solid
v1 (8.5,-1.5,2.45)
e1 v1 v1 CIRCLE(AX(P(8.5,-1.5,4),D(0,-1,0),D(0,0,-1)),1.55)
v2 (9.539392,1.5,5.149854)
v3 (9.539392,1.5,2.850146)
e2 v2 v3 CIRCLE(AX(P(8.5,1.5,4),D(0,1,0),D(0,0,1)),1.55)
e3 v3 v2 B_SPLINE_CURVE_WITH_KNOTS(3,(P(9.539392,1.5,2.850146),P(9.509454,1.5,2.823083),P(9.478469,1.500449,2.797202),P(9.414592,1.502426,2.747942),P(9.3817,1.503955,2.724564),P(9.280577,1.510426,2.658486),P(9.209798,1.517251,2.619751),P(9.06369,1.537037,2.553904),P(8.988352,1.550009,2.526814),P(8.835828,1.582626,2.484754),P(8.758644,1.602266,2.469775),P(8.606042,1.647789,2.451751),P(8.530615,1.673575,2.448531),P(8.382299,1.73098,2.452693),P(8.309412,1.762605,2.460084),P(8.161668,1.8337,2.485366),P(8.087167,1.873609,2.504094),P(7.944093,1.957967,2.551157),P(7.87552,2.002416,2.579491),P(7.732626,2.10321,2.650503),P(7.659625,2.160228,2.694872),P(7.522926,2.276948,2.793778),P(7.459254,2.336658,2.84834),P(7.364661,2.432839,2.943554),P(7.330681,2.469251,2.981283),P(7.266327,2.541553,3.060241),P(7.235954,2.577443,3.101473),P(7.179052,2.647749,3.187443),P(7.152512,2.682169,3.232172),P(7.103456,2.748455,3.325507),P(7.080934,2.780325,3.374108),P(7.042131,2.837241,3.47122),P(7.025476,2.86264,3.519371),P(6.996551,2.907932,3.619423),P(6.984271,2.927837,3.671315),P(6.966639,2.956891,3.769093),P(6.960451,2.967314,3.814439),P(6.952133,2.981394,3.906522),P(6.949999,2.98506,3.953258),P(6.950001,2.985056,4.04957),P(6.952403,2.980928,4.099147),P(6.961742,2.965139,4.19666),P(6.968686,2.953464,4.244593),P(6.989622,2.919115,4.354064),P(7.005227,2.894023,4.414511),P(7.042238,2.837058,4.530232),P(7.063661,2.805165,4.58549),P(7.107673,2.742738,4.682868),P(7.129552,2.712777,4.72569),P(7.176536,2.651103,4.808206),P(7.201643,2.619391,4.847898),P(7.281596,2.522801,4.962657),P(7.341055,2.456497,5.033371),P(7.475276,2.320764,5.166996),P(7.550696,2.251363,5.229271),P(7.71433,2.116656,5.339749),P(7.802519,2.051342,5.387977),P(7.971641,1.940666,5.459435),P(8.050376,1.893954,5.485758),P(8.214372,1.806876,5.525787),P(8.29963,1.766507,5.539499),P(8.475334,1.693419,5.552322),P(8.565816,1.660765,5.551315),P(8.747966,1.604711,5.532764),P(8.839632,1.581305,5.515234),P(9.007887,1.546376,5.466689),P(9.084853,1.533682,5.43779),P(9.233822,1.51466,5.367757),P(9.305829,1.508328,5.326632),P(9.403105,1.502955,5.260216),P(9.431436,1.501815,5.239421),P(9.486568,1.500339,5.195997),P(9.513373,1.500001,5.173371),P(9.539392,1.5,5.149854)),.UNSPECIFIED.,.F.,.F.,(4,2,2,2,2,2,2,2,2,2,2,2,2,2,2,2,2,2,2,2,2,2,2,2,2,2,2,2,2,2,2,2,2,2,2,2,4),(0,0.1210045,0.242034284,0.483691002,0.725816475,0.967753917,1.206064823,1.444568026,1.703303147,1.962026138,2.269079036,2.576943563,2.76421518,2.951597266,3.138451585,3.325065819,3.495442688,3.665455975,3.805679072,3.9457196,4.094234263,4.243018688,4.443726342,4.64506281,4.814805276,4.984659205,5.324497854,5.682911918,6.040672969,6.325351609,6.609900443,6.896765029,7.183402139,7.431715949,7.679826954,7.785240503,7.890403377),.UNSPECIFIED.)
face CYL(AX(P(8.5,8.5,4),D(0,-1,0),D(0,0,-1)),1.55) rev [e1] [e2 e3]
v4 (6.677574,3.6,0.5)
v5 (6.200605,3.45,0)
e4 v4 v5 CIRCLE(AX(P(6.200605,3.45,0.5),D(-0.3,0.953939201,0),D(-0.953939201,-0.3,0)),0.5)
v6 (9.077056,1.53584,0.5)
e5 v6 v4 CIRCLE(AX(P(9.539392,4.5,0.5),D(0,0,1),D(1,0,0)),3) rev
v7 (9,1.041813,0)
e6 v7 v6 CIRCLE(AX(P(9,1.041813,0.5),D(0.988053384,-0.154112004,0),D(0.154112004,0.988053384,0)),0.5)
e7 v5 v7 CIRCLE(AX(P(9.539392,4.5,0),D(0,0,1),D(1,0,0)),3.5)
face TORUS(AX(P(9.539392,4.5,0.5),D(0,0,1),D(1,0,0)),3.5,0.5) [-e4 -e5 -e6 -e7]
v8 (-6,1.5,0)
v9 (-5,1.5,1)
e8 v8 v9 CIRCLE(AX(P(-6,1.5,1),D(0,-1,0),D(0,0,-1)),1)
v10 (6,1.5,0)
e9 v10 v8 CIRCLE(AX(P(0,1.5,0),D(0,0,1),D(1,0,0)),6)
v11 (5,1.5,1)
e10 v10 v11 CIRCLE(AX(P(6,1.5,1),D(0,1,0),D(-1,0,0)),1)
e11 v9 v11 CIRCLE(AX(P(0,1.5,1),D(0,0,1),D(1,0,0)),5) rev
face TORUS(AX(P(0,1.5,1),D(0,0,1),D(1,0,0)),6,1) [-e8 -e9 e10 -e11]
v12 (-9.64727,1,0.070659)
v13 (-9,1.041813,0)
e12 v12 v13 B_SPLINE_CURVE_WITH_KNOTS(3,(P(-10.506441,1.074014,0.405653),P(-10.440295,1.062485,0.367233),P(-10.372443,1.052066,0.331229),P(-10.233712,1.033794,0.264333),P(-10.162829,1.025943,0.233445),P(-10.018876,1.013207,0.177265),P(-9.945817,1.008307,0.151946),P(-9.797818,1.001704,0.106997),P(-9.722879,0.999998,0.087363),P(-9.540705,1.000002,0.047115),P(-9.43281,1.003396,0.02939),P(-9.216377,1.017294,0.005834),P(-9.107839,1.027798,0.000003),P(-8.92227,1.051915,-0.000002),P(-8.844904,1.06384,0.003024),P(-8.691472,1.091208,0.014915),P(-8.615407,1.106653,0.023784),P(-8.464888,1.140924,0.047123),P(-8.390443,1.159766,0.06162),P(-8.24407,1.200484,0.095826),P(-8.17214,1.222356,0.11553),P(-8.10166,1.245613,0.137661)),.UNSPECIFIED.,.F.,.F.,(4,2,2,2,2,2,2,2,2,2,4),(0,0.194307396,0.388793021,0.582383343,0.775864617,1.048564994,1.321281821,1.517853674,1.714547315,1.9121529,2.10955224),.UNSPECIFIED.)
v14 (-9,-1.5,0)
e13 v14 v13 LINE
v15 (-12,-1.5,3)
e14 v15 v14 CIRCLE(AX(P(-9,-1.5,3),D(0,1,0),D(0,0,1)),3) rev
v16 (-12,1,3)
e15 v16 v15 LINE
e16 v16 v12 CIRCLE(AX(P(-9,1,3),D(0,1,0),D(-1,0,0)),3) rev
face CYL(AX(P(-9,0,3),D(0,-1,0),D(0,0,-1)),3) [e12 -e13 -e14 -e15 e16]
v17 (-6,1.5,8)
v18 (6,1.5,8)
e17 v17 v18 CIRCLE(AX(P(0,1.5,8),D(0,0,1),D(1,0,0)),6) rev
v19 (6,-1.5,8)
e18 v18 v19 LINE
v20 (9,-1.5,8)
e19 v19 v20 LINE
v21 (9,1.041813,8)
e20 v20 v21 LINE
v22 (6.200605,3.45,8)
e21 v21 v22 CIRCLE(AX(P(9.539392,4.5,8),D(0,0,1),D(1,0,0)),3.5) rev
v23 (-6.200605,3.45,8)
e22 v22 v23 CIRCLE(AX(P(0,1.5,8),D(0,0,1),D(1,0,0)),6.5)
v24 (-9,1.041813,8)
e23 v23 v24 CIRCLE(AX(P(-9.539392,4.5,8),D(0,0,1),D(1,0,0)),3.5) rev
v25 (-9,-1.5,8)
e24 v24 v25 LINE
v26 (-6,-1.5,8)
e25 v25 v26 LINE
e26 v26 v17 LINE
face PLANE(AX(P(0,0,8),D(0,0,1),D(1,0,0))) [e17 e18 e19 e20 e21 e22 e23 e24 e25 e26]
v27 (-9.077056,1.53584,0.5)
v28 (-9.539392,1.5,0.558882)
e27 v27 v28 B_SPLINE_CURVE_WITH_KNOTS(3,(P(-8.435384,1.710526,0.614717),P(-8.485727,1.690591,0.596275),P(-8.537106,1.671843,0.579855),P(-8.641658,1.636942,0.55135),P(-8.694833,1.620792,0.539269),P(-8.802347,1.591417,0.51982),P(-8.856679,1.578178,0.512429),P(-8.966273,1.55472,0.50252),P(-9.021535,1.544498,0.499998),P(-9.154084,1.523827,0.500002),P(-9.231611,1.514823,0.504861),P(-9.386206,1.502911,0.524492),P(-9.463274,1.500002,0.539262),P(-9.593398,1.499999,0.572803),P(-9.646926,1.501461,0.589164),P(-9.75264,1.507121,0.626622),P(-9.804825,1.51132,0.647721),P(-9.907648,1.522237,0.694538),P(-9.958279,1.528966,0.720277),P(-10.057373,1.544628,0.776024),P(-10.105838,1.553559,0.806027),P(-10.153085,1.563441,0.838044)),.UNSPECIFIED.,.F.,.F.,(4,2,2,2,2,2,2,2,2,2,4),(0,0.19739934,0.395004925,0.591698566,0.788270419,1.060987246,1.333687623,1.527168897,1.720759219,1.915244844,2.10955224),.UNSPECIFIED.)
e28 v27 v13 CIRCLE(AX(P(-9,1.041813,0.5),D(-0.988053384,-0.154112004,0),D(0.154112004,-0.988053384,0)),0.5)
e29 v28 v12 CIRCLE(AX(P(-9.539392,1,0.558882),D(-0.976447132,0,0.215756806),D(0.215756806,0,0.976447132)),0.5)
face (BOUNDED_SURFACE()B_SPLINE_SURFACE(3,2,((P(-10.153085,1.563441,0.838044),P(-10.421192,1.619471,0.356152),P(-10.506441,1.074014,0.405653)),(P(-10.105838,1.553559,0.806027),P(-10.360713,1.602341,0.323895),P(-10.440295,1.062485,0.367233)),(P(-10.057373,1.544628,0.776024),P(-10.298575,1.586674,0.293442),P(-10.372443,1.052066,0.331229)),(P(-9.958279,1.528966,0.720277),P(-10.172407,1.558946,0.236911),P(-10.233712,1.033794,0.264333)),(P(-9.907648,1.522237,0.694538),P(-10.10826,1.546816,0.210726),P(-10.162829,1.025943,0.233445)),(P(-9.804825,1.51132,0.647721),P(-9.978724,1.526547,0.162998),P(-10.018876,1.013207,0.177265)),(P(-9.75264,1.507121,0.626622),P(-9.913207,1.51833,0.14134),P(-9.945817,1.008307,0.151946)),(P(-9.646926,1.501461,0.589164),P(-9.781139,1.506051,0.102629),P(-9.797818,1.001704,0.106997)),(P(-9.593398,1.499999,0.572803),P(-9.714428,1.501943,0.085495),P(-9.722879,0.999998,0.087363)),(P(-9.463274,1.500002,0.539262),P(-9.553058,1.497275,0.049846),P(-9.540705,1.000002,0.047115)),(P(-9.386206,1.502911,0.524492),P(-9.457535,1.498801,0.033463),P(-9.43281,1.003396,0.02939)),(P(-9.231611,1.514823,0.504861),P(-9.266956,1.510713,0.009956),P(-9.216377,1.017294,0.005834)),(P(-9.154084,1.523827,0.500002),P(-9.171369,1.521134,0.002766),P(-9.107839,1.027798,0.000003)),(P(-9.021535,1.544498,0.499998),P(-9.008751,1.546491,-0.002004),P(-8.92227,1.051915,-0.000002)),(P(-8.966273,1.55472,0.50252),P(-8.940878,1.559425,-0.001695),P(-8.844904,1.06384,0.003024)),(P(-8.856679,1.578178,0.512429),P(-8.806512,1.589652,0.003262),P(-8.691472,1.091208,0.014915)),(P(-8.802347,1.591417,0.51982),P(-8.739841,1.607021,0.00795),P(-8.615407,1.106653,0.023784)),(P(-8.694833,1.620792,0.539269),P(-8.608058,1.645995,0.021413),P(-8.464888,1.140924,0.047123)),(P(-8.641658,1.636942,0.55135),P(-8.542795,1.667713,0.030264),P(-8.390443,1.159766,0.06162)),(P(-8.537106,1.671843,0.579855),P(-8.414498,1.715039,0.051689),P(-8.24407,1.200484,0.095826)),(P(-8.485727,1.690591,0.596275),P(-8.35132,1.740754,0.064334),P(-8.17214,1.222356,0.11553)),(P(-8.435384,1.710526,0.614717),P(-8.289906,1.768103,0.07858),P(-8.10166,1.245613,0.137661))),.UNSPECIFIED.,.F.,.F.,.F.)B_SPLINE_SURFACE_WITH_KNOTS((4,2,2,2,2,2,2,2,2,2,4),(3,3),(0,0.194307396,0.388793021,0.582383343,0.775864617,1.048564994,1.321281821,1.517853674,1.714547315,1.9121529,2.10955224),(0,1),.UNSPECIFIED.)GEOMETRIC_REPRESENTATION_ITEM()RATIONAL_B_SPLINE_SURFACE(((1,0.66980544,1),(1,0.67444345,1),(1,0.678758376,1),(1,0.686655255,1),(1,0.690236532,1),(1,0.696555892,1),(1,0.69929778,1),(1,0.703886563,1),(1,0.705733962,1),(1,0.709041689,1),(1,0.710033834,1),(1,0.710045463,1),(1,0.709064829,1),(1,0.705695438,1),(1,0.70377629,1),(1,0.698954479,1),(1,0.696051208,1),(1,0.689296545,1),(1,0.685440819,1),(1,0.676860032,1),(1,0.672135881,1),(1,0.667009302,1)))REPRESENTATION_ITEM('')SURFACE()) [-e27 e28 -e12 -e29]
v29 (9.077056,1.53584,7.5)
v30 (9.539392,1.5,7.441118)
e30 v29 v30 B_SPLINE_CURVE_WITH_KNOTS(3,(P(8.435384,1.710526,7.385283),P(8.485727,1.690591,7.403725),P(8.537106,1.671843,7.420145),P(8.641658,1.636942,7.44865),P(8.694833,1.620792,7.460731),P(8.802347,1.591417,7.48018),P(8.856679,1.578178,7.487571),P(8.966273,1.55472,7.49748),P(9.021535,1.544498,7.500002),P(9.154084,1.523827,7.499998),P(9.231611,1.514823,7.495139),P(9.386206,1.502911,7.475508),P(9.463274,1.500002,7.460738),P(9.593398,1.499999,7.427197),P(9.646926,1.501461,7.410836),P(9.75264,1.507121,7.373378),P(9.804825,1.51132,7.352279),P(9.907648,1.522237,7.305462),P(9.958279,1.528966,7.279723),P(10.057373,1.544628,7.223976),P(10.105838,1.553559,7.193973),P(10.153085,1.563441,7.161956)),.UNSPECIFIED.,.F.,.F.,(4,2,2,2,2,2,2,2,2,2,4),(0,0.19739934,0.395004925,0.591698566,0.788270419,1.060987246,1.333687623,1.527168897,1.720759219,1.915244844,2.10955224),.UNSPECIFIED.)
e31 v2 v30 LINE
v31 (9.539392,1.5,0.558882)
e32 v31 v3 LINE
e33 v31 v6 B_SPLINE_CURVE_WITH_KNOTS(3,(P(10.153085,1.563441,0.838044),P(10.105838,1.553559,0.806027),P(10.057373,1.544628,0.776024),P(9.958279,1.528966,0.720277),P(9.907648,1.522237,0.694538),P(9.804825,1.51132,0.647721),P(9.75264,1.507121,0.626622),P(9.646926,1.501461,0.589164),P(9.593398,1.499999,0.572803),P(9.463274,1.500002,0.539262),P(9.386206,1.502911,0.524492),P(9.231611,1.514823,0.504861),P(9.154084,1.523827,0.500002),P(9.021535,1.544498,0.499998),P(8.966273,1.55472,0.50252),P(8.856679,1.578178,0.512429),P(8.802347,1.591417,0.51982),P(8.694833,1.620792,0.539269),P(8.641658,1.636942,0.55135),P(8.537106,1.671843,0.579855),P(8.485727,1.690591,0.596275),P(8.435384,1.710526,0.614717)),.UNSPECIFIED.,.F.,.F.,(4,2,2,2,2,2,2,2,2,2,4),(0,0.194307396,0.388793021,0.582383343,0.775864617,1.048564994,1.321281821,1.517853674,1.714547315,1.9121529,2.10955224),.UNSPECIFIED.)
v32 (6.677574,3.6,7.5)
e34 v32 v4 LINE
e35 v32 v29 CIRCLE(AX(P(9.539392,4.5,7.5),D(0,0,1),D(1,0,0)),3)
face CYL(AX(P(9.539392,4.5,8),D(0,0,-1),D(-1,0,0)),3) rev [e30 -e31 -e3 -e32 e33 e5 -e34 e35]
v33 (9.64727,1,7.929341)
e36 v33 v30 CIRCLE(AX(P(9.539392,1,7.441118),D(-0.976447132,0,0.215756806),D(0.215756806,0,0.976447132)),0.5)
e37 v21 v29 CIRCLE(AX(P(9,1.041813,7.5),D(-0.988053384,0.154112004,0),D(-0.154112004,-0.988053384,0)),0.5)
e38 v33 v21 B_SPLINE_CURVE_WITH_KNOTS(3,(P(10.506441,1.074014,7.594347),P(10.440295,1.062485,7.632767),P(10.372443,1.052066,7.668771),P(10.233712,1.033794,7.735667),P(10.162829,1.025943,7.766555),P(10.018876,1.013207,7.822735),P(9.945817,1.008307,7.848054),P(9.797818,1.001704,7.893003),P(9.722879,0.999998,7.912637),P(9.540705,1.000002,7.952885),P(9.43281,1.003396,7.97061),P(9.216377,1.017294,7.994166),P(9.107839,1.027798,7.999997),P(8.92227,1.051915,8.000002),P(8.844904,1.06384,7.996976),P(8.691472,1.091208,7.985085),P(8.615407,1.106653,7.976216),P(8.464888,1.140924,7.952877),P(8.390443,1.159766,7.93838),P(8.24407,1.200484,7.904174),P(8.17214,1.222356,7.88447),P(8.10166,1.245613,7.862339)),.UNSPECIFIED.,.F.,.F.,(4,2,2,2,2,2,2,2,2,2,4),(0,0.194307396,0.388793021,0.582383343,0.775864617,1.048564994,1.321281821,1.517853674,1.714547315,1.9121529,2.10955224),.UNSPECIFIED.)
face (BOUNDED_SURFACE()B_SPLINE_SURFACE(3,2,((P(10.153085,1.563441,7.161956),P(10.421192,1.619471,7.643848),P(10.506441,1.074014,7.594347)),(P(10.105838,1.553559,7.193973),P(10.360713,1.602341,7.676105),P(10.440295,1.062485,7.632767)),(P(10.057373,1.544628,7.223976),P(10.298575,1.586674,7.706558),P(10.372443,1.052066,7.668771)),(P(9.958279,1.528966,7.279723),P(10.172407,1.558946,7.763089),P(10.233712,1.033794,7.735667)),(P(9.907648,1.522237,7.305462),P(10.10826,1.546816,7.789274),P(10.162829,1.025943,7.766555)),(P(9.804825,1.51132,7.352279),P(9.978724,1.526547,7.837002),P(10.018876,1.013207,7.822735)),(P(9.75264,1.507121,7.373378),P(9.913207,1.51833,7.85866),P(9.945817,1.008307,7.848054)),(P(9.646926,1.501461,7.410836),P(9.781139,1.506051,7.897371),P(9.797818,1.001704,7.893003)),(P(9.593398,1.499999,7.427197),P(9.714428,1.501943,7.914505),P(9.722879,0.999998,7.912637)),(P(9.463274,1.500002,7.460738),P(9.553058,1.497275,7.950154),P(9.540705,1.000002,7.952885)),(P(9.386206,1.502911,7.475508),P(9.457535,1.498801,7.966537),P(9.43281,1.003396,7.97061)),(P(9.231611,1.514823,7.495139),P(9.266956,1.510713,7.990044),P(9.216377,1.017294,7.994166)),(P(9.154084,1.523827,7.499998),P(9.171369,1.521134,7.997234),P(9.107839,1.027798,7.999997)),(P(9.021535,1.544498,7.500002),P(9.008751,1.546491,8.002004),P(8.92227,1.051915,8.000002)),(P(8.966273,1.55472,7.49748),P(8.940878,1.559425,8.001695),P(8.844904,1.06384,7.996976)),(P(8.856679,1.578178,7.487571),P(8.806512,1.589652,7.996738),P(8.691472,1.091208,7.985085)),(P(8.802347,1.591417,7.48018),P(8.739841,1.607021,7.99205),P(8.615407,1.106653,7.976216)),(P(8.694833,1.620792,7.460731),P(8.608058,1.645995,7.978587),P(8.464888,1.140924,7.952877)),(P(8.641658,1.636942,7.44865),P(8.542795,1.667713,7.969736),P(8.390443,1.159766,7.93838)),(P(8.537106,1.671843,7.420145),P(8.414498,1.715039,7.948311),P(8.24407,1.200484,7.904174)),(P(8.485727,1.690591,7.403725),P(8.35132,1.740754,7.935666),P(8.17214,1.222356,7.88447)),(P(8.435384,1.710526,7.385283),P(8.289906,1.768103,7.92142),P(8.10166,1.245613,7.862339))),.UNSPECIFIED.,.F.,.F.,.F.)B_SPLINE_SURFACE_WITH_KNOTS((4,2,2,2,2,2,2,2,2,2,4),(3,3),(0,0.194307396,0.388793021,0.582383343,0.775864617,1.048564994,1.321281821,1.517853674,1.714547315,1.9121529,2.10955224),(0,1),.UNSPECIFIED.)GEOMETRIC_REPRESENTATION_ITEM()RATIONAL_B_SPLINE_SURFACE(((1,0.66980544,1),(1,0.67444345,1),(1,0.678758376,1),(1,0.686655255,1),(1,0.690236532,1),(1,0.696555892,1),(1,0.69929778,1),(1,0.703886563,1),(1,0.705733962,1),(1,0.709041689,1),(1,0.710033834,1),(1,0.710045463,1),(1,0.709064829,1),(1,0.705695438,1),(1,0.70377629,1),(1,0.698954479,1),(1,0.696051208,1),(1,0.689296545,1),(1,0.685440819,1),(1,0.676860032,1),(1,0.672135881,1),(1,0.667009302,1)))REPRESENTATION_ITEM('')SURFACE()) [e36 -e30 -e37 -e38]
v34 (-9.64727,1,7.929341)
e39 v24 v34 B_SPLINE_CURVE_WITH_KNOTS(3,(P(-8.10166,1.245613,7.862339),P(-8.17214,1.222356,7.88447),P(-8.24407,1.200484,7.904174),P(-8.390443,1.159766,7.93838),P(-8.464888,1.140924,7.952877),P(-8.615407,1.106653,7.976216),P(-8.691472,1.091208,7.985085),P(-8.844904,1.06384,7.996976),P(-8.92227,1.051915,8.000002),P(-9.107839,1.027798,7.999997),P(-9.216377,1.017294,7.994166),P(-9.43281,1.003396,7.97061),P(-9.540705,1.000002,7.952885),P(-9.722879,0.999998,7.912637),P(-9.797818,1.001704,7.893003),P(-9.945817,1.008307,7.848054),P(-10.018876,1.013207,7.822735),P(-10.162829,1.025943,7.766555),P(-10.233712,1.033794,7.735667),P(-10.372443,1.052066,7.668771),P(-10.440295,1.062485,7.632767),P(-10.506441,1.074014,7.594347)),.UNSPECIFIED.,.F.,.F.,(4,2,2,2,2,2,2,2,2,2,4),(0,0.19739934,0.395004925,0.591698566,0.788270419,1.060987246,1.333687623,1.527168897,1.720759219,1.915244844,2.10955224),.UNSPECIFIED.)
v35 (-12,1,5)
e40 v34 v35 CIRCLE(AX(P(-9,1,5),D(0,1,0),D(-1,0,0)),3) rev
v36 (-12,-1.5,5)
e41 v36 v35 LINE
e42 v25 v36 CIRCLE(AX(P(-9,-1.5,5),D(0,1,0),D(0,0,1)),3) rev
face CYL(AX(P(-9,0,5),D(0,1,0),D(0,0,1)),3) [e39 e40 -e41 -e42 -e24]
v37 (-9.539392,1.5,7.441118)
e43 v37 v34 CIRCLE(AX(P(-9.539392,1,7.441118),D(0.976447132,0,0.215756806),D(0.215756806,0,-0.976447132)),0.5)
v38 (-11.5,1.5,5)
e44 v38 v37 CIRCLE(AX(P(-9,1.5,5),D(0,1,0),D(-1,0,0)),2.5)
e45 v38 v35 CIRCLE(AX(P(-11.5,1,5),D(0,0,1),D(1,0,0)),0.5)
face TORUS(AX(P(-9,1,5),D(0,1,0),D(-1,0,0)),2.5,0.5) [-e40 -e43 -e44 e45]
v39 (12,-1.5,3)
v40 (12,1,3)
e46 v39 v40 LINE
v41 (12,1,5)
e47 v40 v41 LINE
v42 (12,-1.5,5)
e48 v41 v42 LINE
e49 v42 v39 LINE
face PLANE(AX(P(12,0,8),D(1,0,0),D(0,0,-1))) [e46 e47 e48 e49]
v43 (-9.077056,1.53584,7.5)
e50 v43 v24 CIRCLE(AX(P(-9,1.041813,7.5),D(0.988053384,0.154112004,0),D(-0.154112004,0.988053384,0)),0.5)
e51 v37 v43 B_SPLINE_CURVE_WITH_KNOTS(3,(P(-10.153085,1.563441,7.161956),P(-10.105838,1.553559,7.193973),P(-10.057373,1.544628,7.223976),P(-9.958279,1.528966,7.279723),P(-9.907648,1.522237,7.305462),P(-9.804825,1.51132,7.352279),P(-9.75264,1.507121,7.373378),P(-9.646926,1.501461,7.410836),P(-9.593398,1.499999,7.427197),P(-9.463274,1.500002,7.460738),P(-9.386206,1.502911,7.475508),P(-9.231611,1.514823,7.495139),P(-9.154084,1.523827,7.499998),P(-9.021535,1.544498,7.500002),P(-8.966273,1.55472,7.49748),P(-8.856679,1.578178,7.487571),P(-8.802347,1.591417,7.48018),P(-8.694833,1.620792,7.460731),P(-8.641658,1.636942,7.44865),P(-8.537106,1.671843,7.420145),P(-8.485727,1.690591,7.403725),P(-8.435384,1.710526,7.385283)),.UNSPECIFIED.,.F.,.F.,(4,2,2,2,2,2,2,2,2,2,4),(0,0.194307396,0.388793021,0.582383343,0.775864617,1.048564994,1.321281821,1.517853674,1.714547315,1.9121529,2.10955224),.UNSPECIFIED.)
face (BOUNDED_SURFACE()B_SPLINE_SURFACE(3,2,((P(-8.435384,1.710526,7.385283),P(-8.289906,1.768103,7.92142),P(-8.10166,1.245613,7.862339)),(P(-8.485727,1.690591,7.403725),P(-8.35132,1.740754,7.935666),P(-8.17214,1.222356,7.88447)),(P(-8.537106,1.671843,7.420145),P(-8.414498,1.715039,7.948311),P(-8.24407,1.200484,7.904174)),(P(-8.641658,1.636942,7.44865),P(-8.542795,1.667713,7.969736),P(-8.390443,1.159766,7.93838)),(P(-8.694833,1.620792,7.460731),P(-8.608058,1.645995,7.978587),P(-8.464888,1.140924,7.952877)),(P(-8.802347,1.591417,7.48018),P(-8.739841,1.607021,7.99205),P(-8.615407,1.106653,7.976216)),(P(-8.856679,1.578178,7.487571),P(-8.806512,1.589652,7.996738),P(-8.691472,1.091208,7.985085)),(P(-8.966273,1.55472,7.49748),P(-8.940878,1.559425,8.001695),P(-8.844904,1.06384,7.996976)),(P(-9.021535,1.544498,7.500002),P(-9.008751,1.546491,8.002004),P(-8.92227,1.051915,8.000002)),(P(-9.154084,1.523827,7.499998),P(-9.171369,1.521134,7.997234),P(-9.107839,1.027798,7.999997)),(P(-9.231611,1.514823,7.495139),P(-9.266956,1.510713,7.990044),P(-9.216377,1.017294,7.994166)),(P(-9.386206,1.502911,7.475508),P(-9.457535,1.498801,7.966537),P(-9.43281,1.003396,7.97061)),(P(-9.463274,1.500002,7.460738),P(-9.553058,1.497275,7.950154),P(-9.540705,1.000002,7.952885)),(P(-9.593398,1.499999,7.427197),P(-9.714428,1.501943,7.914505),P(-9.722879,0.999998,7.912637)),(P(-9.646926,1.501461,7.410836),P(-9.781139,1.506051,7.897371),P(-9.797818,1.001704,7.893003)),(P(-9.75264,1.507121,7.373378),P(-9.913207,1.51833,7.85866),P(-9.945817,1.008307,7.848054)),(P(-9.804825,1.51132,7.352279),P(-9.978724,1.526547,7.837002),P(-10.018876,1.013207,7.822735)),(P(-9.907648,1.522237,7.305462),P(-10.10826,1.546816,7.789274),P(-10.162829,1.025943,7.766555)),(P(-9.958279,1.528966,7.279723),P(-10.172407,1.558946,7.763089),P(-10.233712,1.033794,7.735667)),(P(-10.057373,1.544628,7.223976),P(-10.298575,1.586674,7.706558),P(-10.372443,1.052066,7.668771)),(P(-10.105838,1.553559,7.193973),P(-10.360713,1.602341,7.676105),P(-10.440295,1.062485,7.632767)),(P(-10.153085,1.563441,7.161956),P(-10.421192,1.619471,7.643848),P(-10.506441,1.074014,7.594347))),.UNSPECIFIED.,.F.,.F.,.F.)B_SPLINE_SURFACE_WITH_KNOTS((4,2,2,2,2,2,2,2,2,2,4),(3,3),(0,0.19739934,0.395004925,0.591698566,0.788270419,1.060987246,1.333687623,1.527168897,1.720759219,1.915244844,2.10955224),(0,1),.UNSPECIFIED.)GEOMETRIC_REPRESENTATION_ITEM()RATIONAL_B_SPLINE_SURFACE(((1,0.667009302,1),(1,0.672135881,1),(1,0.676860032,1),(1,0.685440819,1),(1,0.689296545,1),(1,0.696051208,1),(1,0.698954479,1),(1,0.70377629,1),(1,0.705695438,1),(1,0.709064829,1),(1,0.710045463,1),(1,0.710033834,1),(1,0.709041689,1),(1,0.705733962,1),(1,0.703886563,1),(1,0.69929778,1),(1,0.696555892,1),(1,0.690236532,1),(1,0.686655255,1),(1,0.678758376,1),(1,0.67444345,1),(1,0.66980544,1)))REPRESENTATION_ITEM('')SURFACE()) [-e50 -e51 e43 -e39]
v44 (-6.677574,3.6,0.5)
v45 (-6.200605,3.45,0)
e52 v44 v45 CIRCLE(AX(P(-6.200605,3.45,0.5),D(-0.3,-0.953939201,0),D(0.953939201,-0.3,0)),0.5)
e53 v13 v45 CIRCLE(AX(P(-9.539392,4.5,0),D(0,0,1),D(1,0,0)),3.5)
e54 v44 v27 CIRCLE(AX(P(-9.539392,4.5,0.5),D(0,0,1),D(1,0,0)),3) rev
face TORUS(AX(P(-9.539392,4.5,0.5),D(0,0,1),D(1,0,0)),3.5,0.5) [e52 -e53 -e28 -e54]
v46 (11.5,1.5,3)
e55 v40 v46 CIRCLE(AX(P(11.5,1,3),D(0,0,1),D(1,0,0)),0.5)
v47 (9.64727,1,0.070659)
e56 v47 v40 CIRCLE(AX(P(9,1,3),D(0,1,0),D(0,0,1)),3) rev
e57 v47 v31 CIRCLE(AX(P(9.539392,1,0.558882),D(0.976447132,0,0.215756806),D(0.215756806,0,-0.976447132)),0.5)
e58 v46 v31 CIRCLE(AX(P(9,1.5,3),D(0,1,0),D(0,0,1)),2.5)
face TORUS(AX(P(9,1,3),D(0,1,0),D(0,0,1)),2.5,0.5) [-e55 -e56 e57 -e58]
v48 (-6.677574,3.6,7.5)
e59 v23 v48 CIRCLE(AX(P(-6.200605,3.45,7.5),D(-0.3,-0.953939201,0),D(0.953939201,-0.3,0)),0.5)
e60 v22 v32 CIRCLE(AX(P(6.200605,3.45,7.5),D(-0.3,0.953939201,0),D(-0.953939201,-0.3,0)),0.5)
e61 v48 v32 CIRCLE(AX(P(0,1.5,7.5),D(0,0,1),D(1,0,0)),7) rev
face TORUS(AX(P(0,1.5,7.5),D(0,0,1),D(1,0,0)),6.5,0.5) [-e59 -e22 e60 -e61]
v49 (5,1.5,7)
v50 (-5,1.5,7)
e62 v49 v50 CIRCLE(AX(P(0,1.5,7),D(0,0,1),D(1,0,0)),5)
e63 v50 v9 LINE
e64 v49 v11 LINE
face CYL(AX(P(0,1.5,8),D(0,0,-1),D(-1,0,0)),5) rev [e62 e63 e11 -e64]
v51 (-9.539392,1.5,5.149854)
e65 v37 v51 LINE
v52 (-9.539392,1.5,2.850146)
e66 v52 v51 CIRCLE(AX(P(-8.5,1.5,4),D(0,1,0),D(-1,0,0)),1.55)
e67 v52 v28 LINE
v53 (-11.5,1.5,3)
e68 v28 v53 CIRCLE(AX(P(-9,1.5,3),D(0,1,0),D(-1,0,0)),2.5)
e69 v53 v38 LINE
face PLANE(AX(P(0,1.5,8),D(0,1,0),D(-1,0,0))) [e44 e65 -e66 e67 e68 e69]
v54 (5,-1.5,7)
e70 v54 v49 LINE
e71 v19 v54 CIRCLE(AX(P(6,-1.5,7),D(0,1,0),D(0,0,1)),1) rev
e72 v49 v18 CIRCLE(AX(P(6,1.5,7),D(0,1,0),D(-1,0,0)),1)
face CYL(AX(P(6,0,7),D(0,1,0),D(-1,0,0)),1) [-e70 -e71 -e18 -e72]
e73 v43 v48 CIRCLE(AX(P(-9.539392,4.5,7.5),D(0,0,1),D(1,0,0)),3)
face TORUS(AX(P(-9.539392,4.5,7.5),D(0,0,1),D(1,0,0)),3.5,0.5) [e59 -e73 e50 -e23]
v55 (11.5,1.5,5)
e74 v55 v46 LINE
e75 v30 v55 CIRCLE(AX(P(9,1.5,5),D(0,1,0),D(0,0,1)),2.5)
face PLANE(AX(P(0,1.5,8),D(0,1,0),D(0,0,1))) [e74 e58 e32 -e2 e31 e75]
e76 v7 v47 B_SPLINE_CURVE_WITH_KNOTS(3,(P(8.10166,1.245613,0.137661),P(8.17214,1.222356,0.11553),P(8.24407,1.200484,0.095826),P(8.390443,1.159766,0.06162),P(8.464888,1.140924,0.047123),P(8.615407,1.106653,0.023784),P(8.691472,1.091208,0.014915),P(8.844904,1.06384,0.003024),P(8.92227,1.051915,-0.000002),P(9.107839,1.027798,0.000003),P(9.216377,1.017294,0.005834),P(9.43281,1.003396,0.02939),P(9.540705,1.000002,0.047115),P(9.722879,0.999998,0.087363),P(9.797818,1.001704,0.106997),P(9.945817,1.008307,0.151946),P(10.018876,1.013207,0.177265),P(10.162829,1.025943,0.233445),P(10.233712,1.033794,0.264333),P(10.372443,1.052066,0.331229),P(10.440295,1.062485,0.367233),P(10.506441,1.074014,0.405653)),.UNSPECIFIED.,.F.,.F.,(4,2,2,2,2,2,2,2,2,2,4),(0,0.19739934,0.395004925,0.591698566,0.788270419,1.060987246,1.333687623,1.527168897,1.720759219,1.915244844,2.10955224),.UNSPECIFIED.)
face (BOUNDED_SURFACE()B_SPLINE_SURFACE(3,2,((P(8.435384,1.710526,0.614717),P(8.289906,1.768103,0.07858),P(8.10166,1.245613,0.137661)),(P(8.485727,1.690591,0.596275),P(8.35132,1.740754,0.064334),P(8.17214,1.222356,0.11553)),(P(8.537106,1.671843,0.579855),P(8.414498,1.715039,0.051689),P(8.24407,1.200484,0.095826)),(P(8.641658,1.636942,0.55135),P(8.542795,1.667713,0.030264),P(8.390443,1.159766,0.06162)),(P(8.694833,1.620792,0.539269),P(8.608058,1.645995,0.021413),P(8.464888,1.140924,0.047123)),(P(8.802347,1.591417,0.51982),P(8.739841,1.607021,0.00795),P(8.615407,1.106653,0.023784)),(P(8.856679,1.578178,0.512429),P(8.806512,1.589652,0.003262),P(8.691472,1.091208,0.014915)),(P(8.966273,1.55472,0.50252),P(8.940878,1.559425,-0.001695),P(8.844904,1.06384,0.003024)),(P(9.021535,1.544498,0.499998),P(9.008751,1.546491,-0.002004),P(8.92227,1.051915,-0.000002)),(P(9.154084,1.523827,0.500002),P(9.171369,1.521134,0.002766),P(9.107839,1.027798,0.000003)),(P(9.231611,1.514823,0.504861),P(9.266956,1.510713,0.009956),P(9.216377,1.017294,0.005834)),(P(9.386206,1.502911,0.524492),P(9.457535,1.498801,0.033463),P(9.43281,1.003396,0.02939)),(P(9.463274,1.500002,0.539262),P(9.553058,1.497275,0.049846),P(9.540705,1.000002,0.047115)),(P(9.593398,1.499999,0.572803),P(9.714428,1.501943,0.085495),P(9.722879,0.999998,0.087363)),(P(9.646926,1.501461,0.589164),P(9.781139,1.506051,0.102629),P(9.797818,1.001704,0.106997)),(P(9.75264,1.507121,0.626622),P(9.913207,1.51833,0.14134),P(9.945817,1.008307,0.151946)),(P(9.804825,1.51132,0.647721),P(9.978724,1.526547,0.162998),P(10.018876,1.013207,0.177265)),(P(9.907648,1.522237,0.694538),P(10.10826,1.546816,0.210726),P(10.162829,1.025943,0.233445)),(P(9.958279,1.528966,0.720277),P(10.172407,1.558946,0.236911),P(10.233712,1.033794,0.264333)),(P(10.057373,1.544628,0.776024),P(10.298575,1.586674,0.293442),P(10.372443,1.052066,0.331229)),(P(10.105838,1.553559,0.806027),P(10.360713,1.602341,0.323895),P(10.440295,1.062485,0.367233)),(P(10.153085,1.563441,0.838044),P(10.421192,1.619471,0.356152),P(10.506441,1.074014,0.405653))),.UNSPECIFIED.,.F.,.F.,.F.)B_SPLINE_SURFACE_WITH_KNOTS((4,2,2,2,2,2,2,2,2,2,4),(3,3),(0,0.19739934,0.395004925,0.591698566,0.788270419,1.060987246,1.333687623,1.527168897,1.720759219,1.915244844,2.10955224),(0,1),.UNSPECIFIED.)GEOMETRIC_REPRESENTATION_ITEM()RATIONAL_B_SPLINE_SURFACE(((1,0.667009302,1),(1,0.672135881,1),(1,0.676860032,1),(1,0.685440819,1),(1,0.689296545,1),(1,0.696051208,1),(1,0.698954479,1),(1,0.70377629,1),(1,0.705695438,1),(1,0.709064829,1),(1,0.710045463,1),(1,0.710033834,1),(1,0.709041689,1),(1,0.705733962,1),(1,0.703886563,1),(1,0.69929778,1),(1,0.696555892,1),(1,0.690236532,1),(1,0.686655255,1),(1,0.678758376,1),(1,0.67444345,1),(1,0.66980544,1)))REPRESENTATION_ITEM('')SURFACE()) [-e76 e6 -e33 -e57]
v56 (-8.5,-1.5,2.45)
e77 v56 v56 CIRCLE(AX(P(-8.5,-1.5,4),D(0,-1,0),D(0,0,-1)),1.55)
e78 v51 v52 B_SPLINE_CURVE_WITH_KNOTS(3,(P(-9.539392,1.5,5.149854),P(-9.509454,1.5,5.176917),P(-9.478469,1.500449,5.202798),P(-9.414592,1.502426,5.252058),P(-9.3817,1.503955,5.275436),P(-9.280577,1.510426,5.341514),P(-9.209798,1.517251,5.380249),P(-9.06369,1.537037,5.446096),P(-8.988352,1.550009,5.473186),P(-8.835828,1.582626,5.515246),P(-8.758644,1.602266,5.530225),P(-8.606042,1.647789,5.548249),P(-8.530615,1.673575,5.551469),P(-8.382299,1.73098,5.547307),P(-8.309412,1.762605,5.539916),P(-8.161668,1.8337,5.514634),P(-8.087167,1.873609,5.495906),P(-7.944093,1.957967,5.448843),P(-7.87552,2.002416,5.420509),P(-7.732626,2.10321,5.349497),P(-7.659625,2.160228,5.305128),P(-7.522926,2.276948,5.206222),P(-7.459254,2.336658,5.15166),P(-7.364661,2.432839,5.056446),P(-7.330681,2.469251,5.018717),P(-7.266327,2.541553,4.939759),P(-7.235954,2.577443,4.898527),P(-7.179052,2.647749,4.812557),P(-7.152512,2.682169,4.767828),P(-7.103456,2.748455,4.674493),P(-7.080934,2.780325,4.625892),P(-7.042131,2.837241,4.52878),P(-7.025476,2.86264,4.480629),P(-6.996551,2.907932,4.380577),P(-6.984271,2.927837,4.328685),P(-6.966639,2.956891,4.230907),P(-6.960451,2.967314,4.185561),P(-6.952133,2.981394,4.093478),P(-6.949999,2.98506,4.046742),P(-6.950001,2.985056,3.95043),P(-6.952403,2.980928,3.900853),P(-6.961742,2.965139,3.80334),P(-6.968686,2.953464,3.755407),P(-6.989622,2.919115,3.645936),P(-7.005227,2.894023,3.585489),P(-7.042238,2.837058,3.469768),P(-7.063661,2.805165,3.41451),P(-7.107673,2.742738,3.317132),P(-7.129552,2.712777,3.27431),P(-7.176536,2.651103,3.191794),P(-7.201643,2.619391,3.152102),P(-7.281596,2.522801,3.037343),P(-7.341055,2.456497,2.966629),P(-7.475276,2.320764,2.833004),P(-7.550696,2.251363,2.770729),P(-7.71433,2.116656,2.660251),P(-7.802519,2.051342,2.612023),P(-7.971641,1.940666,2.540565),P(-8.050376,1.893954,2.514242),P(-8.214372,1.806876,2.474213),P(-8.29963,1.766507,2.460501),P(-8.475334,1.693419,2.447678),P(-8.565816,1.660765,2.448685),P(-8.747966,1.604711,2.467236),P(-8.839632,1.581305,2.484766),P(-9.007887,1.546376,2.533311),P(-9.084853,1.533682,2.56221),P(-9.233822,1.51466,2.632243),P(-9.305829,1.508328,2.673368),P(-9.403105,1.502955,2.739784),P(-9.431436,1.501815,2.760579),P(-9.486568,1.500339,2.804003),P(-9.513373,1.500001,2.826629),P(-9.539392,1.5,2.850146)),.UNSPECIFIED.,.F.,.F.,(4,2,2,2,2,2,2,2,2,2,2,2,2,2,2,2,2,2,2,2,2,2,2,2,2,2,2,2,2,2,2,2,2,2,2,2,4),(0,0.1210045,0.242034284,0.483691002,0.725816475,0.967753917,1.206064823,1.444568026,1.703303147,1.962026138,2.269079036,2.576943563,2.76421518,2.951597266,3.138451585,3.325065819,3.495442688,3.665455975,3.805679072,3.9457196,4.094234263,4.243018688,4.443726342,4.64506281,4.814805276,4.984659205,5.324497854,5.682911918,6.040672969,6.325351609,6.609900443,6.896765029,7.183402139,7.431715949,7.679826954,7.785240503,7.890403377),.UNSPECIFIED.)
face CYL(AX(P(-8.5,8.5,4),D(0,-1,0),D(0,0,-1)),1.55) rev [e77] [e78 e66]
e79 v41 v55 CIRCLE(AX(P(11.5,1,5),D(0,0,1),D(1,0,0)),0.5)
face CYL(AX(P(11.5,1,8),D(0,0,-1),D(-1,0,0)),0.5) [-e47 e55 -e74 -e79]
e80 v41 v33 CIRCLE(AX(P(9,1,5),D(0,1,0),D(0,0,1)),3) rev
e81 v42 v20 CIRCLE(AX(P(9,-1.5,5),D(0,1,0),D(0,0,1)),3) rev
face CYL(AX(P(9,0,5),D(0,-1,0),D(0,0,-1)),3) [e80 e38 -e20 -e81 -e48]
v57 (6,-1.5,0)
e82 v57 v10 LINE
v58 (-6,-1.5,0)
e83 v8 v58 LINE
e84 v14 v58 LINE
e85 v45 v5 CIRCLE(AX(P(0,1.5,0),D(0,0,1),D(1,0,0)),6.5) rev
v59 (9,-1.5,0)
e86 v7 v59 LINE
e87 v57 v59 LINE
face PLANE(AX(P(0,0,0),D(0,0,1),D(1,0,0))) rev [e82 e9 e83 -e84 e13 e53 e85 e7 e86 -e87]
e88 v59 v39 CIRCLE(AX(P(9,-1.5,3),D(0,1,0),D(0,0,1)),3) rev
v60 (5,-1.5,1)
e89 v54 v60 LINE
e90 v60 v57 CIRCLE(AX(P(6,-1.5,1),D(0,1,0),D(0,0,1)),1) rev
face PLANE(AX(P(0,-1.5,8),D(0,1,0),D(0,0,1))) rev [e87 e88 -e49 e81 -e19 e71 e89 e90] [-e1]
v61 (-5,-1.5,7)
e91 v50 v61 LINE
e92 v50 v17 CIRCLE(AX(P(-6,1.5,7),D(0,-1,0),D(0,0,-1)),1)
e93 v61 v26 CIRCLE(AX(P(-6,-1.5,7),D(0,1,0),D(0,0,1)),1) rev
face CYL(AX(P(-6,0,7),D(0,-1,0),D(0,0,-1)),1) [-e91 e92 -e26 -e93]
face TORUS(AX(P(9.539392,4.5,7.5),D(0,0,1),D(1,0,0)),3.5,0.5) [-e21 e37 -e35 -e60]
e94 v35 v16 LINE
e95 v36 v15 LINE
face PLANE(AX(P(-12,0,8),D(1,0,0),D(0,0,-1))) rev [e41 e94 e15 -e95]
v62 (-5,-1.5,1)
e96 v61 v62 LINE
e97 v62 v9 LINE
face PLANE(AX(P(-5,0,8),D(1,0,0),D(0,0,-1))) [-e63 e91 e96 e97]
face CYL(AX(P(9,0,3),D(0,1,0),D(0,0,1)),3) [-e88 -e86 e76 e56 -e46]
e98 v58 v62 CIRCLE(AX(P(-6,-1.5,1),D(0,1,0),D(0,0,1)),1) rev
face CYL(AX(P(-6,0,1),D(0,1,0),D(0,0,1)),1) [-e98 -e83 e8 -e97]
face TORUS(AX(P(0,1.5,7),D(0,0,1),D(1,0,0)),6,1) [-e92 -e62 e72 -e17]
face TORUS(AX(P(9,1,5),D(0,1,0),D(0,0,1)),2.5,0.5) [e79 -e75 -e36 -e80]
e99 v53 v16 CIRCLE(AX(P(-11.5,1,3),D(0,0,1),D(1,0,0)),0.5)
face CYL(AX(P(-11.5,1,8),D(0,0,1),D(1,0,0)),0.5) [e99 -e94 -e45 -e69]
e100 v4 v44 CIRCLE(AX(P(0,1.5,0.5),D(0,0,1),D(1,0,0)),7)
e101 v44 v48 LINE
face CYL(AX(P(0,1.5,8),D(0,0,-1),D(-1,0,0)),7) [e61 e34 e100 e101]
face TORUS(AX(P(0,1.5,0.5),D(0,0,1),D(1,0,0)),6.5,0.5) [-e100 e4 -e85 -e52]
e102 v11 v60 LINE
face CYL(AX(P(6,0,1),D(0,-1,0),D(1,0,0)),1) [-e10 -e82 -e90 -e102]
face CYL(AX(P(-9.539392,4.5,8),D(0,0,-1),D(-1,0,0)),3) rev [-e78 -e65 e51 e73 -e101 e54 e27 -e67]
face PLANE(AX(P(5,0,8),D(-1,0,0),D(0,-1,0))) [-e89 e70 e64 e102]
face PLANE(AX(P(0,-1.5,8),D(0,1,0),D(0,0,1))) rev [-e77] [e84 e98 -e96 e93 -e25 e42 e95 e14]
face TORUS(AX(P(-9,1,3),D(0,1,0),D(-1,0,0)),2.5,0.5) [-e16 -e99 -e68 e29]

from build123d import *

# Parameters (mm, degrees)
BOSS_EXTRUDE1_DEPTH = 8
SKETCH2_R           = 1.55
CUT_EXTRUDE1_DEPTH  = 18.549928775
FILLET1_R           = 3
FILLET2_R           = 3
FILLET3_R           = 1
FILLET4_R           = 0.5


with BuildPart() as part:
    # Sketch1 → Boss-Extrude1 (new body)
    with BuildSketch(Plane.XY):
        with BuildLine():
            Line((-5, -1.5), (-5, 0))
            Line((-5, 0), (-5, 1.5))
            ThreePointArc((-5, 1.5), (0, 6.5), (5, 1.5))
            Line((5, 1.5), (5, 0))
            Line((5, 0), (5, -1.5))
            Line((5, -1.5), (12, -1.5))
            Line((12, -1.5), (12, 1.5))
            Line((12, 1.5), (7, 1.5))
            ThreePointArc((7, 1.5), (0, 8.5), (-7, 1.5))
            Line((-7, 1.5), (-12, 1.5))
            Line((-12, 1.5), (-12, -1.5))
            Line((-12, -1.5), (-5, -1.5))
        make_face()
    extrude(amount=BOSS_EXTRUDE1_DEPTH)

    # Sketch2 → Cut-Extrude1 (cut, through all)
    with BuildSketch(Plane.XZ.offset(1.5)):
        with Locations(Location((-8.5, 4, 0), (0, 0, 270))):
            Circle(SKETCH2_R)
        with Locations(Location((8.5, 4, 0), (0, 0, 270))):
            Circle(SKETCH2_R)
    extrude(amount=-CUT_EXTRUDE1_DEPTH, mode=Mode.SUBTRACT)

    # Fillet1
    # the kernel refuses this fillet: 3 mm, written as the material it adds along each edge
    with BuildSketch(Plane(origin=(-7, 1.5, -1.957967552), x_dir=(-1, 0, 0), z_dir=(0, 0, 1))) as fillet1_piece_1_section:
        with BuildLine():
            CenterArc((2.539392014, -3), FILLET1_R, 90, 72.542396876)
            ThreePointArc((-0.32242559, -2.1), (-0.081075919, -1.062303895), (0, 0))
            Line((0, 0), (2.539392014, 0))
        make_face()
    fillet1_piece_1 = extrude(amount=9.957967552, mode=Mode.PRIVATE)
    fillet1_piece_1 = split(fillet1_piece_1, bisect_by=Plane(origin=(-8.907059095, 1.548017233, 0), z_dir=(0, 0, 1)), keep=Keep.TOP, mode=Mode.PRIVATE)
    fillet1_piece_1 = fillet1_piece_1 - Plane(origin=(-8.5, 1.548017233, 4), x_dir=(0, 0, -1), z_dir=(0, -1, 0)) * Cylinder(1.55, 31, mode=Mode.PRIVATE)
    add(fillet1_piece_1)
    with BuildSketch(Plane(origin=(-7, 1.5, 0), x_dir=(-1, 0, 0), z_dir=(0, 0, 1))) as fillet1_piece_2_section:
        with BuildLine():
            CenterArc((2.539392014, -3), FILLET1_R, 90, 72.542396876)
            ThreePointArc((-0.32242559, -2.1), (-0.081075919, -1.062303895), (0, 0))
            Line((0, 0), (2.539392014, 0))
        make_face()
    fillet1_piece_2 = extrude(amount=9.957967552, mode=Mode.PRIVATE)
    fillet1_piece_2 = split(fillet1_piece_2, bisect_by=Plane(origin=(-8.907059095, 1.548017233, 8), z_dir=(0, 0, -1)), keep=Keep.TOP, mode=Mode.PRIVATE)
    fillet1_piece_2 = fillet1_piece_2 - Plane(origin=(-8.5, 1.548017233, 4), x_dir=(0, 0, -1), z_dir=(0, -1, 0)) * Cylinder(1.55, 31, mode=Mode.PRIVATE)
    add(fillet1_piece_2)
    with BuildSketch(Plane(origin=(7, 1.5, -1.957967552), x_dir=(-0.15175769928250127, 0.9884177258166114, 0), z_dir=(0, 0, 1))) as fillet1_piece_3_section:
        with BuildLine():
            CenterArc((2.579880888, -2.965253177), FILLET1_R, 98.728801562, 72.542396876)
            Line((-0.38537229, -2.50998008), (0, 0))
            ThreePointArc((0, 0), (1.062303895, -0.081075919), (2.12460779, 0))
        make_face()
    fillet1_piece_3 = extrude(amount=9.957967552, mode=Mode.PRIVATE)
    fillet1_piece_3 = split(fillet1_piece_3, bisect_by=Plane(origin=(6.913079809, 3.011198011, 0), z_dir=(0, 0, 1)), keep=Keep.TOP, mode=Mode.PRIVATE)
    fillet1_piece_3 = fillet1_piece_3 - Plane(origin=(8.5, 3.011198011, 4), x_dir=(0, 0, -1), z_dir=(0, -1, 0)) * Cylinder(1.55, 30, mode=Mode.PRIVATE)
    add(fillet1_piece_3)
    with BuildSketch(Plane(origin=(7, 1.5, 0), x_dir=(-0.15175769928250127, 0.9884177258166114, 0), z_dir=(0, 0, 1))) as fillet1_piece_4_section:
        with BuildLine():
            CenterArc((2.579880888, -2.965253177), FILLET1_R, 98.728801562, 72.542396876)
            Line((-0.38537229, -2.50998008), (0, 0))
            ThreePointArc((0, 0), (1.062303895, -0.081075919), (2.12460779, 0))
        make_face()
    fillet1_piece_4 = extrude(amount=9.957967552, mode=Mode.PRIVATE)
    fillet1_piece_4 = split(fillet1_piece_4, bisect_by=Plane(origin=(6.913079809, 3.011198011, 8), z_dir=(0, 0, -1)), keep=Keep.TOP, mode=Mode.PRIVATE)
    fillet1_piece_4 = fillet1_piece_4 - Plane(origin=(8.5, 3.011198011, 4), x_dir=(0, 0, -1), z_dir=(0, -1, 0)) * Cylinder(1.55, 30, mode=Mode.PRIVATE)
    add(fillet1_piece_4)

    # Fillet2
    # the kernel refuses this fillet: 3 mm, written as the material it takes off along each edge
    with BuildSketch(Plane(origin=(-12, 9, 0), x_dir=(1, 0, 0), z_dir=(0, -1, 0)), Plane(origin=(12, -9, 0), x_dir=(-1, 0, 0), z_dir=(0, 1, 0))) as fillet2_piece_1:
        with BuildLine():
            CenterArc((FILLET2_R, FILLET2_R), FILLET2_R, 180, 90)
            Line((0, FILLET2_R), (0, 0))
            Line((0, 0), (FILLET2_R, 0))
        make_face()
    extrude(amount=18, mode=Mode.SUBTRACT)
    with BuildSketch(Plane(origin=(-12, 9, 8), x_dir=(1, 0, 0), z_dir=(0, -1, 0)), Plane(origin=(12, -9, 8), x_dir=(-1, 0, 0), z_dir=(0, 1, 0))) as fillet2_piece_2:
        with BuildLine():
            CenterArc((FILLET2_R, -FILLET2_R), FILLET2_R, 90, 90)
            Line((0, -FILLET2_R), (0, 0))
            Line((0, 0), (FILLET2_R, 0))
        make_face()
    extrude(amount=18, mode=Mode.SUBTRACT)

    # Fillet3
    fillet3_edges = [part.edges().sort_by_distance(p)[0] for p in [
        (5, 0, 0),
        (0, 6.5, 0),
        (-5, 0, 0),
        (-5, 0, 8),
        (0, 6.5, 8),
        (5, 0, 8),
    ]]
    fillet(fillet3_edges, radius=FILLET3_R)

    # Fillet4
    fillet4_edges = [part.edges().sort_by_distance(p)[0] for p in [
        (0, 8.5, 8),
        (0, 8.5, 0),
        (-7.553486472, 2.251405066, 8),
        (7.553486472, 2.251405066, 0),
        (7.553486472, 2.251405066, 8),
        (-12, 1.5, 4),
        (-11.304145833, 1.5, 1.078825365),
        (-11.304145833, 1.5, 6.921174635),
        (-7.553486472, 2.251405066, 0),
        (-9.269696007, 1.512147249, 0.012147249),
        (-9.269696007, 1.512147249, 7.987852751),
        (12, 1.5, 4),
        (9.269696008, 1.512147249, 0.012147249),
        (9.269696008, 1.512147249, 7.987852751),
        (11.304145833, 1.5, 1.078825365),
        (11.304145833, 1.5, 6.921174635),
    ]]
    fillet(fillet4_edges, radius=FILLET4_R)


solid = part.part
